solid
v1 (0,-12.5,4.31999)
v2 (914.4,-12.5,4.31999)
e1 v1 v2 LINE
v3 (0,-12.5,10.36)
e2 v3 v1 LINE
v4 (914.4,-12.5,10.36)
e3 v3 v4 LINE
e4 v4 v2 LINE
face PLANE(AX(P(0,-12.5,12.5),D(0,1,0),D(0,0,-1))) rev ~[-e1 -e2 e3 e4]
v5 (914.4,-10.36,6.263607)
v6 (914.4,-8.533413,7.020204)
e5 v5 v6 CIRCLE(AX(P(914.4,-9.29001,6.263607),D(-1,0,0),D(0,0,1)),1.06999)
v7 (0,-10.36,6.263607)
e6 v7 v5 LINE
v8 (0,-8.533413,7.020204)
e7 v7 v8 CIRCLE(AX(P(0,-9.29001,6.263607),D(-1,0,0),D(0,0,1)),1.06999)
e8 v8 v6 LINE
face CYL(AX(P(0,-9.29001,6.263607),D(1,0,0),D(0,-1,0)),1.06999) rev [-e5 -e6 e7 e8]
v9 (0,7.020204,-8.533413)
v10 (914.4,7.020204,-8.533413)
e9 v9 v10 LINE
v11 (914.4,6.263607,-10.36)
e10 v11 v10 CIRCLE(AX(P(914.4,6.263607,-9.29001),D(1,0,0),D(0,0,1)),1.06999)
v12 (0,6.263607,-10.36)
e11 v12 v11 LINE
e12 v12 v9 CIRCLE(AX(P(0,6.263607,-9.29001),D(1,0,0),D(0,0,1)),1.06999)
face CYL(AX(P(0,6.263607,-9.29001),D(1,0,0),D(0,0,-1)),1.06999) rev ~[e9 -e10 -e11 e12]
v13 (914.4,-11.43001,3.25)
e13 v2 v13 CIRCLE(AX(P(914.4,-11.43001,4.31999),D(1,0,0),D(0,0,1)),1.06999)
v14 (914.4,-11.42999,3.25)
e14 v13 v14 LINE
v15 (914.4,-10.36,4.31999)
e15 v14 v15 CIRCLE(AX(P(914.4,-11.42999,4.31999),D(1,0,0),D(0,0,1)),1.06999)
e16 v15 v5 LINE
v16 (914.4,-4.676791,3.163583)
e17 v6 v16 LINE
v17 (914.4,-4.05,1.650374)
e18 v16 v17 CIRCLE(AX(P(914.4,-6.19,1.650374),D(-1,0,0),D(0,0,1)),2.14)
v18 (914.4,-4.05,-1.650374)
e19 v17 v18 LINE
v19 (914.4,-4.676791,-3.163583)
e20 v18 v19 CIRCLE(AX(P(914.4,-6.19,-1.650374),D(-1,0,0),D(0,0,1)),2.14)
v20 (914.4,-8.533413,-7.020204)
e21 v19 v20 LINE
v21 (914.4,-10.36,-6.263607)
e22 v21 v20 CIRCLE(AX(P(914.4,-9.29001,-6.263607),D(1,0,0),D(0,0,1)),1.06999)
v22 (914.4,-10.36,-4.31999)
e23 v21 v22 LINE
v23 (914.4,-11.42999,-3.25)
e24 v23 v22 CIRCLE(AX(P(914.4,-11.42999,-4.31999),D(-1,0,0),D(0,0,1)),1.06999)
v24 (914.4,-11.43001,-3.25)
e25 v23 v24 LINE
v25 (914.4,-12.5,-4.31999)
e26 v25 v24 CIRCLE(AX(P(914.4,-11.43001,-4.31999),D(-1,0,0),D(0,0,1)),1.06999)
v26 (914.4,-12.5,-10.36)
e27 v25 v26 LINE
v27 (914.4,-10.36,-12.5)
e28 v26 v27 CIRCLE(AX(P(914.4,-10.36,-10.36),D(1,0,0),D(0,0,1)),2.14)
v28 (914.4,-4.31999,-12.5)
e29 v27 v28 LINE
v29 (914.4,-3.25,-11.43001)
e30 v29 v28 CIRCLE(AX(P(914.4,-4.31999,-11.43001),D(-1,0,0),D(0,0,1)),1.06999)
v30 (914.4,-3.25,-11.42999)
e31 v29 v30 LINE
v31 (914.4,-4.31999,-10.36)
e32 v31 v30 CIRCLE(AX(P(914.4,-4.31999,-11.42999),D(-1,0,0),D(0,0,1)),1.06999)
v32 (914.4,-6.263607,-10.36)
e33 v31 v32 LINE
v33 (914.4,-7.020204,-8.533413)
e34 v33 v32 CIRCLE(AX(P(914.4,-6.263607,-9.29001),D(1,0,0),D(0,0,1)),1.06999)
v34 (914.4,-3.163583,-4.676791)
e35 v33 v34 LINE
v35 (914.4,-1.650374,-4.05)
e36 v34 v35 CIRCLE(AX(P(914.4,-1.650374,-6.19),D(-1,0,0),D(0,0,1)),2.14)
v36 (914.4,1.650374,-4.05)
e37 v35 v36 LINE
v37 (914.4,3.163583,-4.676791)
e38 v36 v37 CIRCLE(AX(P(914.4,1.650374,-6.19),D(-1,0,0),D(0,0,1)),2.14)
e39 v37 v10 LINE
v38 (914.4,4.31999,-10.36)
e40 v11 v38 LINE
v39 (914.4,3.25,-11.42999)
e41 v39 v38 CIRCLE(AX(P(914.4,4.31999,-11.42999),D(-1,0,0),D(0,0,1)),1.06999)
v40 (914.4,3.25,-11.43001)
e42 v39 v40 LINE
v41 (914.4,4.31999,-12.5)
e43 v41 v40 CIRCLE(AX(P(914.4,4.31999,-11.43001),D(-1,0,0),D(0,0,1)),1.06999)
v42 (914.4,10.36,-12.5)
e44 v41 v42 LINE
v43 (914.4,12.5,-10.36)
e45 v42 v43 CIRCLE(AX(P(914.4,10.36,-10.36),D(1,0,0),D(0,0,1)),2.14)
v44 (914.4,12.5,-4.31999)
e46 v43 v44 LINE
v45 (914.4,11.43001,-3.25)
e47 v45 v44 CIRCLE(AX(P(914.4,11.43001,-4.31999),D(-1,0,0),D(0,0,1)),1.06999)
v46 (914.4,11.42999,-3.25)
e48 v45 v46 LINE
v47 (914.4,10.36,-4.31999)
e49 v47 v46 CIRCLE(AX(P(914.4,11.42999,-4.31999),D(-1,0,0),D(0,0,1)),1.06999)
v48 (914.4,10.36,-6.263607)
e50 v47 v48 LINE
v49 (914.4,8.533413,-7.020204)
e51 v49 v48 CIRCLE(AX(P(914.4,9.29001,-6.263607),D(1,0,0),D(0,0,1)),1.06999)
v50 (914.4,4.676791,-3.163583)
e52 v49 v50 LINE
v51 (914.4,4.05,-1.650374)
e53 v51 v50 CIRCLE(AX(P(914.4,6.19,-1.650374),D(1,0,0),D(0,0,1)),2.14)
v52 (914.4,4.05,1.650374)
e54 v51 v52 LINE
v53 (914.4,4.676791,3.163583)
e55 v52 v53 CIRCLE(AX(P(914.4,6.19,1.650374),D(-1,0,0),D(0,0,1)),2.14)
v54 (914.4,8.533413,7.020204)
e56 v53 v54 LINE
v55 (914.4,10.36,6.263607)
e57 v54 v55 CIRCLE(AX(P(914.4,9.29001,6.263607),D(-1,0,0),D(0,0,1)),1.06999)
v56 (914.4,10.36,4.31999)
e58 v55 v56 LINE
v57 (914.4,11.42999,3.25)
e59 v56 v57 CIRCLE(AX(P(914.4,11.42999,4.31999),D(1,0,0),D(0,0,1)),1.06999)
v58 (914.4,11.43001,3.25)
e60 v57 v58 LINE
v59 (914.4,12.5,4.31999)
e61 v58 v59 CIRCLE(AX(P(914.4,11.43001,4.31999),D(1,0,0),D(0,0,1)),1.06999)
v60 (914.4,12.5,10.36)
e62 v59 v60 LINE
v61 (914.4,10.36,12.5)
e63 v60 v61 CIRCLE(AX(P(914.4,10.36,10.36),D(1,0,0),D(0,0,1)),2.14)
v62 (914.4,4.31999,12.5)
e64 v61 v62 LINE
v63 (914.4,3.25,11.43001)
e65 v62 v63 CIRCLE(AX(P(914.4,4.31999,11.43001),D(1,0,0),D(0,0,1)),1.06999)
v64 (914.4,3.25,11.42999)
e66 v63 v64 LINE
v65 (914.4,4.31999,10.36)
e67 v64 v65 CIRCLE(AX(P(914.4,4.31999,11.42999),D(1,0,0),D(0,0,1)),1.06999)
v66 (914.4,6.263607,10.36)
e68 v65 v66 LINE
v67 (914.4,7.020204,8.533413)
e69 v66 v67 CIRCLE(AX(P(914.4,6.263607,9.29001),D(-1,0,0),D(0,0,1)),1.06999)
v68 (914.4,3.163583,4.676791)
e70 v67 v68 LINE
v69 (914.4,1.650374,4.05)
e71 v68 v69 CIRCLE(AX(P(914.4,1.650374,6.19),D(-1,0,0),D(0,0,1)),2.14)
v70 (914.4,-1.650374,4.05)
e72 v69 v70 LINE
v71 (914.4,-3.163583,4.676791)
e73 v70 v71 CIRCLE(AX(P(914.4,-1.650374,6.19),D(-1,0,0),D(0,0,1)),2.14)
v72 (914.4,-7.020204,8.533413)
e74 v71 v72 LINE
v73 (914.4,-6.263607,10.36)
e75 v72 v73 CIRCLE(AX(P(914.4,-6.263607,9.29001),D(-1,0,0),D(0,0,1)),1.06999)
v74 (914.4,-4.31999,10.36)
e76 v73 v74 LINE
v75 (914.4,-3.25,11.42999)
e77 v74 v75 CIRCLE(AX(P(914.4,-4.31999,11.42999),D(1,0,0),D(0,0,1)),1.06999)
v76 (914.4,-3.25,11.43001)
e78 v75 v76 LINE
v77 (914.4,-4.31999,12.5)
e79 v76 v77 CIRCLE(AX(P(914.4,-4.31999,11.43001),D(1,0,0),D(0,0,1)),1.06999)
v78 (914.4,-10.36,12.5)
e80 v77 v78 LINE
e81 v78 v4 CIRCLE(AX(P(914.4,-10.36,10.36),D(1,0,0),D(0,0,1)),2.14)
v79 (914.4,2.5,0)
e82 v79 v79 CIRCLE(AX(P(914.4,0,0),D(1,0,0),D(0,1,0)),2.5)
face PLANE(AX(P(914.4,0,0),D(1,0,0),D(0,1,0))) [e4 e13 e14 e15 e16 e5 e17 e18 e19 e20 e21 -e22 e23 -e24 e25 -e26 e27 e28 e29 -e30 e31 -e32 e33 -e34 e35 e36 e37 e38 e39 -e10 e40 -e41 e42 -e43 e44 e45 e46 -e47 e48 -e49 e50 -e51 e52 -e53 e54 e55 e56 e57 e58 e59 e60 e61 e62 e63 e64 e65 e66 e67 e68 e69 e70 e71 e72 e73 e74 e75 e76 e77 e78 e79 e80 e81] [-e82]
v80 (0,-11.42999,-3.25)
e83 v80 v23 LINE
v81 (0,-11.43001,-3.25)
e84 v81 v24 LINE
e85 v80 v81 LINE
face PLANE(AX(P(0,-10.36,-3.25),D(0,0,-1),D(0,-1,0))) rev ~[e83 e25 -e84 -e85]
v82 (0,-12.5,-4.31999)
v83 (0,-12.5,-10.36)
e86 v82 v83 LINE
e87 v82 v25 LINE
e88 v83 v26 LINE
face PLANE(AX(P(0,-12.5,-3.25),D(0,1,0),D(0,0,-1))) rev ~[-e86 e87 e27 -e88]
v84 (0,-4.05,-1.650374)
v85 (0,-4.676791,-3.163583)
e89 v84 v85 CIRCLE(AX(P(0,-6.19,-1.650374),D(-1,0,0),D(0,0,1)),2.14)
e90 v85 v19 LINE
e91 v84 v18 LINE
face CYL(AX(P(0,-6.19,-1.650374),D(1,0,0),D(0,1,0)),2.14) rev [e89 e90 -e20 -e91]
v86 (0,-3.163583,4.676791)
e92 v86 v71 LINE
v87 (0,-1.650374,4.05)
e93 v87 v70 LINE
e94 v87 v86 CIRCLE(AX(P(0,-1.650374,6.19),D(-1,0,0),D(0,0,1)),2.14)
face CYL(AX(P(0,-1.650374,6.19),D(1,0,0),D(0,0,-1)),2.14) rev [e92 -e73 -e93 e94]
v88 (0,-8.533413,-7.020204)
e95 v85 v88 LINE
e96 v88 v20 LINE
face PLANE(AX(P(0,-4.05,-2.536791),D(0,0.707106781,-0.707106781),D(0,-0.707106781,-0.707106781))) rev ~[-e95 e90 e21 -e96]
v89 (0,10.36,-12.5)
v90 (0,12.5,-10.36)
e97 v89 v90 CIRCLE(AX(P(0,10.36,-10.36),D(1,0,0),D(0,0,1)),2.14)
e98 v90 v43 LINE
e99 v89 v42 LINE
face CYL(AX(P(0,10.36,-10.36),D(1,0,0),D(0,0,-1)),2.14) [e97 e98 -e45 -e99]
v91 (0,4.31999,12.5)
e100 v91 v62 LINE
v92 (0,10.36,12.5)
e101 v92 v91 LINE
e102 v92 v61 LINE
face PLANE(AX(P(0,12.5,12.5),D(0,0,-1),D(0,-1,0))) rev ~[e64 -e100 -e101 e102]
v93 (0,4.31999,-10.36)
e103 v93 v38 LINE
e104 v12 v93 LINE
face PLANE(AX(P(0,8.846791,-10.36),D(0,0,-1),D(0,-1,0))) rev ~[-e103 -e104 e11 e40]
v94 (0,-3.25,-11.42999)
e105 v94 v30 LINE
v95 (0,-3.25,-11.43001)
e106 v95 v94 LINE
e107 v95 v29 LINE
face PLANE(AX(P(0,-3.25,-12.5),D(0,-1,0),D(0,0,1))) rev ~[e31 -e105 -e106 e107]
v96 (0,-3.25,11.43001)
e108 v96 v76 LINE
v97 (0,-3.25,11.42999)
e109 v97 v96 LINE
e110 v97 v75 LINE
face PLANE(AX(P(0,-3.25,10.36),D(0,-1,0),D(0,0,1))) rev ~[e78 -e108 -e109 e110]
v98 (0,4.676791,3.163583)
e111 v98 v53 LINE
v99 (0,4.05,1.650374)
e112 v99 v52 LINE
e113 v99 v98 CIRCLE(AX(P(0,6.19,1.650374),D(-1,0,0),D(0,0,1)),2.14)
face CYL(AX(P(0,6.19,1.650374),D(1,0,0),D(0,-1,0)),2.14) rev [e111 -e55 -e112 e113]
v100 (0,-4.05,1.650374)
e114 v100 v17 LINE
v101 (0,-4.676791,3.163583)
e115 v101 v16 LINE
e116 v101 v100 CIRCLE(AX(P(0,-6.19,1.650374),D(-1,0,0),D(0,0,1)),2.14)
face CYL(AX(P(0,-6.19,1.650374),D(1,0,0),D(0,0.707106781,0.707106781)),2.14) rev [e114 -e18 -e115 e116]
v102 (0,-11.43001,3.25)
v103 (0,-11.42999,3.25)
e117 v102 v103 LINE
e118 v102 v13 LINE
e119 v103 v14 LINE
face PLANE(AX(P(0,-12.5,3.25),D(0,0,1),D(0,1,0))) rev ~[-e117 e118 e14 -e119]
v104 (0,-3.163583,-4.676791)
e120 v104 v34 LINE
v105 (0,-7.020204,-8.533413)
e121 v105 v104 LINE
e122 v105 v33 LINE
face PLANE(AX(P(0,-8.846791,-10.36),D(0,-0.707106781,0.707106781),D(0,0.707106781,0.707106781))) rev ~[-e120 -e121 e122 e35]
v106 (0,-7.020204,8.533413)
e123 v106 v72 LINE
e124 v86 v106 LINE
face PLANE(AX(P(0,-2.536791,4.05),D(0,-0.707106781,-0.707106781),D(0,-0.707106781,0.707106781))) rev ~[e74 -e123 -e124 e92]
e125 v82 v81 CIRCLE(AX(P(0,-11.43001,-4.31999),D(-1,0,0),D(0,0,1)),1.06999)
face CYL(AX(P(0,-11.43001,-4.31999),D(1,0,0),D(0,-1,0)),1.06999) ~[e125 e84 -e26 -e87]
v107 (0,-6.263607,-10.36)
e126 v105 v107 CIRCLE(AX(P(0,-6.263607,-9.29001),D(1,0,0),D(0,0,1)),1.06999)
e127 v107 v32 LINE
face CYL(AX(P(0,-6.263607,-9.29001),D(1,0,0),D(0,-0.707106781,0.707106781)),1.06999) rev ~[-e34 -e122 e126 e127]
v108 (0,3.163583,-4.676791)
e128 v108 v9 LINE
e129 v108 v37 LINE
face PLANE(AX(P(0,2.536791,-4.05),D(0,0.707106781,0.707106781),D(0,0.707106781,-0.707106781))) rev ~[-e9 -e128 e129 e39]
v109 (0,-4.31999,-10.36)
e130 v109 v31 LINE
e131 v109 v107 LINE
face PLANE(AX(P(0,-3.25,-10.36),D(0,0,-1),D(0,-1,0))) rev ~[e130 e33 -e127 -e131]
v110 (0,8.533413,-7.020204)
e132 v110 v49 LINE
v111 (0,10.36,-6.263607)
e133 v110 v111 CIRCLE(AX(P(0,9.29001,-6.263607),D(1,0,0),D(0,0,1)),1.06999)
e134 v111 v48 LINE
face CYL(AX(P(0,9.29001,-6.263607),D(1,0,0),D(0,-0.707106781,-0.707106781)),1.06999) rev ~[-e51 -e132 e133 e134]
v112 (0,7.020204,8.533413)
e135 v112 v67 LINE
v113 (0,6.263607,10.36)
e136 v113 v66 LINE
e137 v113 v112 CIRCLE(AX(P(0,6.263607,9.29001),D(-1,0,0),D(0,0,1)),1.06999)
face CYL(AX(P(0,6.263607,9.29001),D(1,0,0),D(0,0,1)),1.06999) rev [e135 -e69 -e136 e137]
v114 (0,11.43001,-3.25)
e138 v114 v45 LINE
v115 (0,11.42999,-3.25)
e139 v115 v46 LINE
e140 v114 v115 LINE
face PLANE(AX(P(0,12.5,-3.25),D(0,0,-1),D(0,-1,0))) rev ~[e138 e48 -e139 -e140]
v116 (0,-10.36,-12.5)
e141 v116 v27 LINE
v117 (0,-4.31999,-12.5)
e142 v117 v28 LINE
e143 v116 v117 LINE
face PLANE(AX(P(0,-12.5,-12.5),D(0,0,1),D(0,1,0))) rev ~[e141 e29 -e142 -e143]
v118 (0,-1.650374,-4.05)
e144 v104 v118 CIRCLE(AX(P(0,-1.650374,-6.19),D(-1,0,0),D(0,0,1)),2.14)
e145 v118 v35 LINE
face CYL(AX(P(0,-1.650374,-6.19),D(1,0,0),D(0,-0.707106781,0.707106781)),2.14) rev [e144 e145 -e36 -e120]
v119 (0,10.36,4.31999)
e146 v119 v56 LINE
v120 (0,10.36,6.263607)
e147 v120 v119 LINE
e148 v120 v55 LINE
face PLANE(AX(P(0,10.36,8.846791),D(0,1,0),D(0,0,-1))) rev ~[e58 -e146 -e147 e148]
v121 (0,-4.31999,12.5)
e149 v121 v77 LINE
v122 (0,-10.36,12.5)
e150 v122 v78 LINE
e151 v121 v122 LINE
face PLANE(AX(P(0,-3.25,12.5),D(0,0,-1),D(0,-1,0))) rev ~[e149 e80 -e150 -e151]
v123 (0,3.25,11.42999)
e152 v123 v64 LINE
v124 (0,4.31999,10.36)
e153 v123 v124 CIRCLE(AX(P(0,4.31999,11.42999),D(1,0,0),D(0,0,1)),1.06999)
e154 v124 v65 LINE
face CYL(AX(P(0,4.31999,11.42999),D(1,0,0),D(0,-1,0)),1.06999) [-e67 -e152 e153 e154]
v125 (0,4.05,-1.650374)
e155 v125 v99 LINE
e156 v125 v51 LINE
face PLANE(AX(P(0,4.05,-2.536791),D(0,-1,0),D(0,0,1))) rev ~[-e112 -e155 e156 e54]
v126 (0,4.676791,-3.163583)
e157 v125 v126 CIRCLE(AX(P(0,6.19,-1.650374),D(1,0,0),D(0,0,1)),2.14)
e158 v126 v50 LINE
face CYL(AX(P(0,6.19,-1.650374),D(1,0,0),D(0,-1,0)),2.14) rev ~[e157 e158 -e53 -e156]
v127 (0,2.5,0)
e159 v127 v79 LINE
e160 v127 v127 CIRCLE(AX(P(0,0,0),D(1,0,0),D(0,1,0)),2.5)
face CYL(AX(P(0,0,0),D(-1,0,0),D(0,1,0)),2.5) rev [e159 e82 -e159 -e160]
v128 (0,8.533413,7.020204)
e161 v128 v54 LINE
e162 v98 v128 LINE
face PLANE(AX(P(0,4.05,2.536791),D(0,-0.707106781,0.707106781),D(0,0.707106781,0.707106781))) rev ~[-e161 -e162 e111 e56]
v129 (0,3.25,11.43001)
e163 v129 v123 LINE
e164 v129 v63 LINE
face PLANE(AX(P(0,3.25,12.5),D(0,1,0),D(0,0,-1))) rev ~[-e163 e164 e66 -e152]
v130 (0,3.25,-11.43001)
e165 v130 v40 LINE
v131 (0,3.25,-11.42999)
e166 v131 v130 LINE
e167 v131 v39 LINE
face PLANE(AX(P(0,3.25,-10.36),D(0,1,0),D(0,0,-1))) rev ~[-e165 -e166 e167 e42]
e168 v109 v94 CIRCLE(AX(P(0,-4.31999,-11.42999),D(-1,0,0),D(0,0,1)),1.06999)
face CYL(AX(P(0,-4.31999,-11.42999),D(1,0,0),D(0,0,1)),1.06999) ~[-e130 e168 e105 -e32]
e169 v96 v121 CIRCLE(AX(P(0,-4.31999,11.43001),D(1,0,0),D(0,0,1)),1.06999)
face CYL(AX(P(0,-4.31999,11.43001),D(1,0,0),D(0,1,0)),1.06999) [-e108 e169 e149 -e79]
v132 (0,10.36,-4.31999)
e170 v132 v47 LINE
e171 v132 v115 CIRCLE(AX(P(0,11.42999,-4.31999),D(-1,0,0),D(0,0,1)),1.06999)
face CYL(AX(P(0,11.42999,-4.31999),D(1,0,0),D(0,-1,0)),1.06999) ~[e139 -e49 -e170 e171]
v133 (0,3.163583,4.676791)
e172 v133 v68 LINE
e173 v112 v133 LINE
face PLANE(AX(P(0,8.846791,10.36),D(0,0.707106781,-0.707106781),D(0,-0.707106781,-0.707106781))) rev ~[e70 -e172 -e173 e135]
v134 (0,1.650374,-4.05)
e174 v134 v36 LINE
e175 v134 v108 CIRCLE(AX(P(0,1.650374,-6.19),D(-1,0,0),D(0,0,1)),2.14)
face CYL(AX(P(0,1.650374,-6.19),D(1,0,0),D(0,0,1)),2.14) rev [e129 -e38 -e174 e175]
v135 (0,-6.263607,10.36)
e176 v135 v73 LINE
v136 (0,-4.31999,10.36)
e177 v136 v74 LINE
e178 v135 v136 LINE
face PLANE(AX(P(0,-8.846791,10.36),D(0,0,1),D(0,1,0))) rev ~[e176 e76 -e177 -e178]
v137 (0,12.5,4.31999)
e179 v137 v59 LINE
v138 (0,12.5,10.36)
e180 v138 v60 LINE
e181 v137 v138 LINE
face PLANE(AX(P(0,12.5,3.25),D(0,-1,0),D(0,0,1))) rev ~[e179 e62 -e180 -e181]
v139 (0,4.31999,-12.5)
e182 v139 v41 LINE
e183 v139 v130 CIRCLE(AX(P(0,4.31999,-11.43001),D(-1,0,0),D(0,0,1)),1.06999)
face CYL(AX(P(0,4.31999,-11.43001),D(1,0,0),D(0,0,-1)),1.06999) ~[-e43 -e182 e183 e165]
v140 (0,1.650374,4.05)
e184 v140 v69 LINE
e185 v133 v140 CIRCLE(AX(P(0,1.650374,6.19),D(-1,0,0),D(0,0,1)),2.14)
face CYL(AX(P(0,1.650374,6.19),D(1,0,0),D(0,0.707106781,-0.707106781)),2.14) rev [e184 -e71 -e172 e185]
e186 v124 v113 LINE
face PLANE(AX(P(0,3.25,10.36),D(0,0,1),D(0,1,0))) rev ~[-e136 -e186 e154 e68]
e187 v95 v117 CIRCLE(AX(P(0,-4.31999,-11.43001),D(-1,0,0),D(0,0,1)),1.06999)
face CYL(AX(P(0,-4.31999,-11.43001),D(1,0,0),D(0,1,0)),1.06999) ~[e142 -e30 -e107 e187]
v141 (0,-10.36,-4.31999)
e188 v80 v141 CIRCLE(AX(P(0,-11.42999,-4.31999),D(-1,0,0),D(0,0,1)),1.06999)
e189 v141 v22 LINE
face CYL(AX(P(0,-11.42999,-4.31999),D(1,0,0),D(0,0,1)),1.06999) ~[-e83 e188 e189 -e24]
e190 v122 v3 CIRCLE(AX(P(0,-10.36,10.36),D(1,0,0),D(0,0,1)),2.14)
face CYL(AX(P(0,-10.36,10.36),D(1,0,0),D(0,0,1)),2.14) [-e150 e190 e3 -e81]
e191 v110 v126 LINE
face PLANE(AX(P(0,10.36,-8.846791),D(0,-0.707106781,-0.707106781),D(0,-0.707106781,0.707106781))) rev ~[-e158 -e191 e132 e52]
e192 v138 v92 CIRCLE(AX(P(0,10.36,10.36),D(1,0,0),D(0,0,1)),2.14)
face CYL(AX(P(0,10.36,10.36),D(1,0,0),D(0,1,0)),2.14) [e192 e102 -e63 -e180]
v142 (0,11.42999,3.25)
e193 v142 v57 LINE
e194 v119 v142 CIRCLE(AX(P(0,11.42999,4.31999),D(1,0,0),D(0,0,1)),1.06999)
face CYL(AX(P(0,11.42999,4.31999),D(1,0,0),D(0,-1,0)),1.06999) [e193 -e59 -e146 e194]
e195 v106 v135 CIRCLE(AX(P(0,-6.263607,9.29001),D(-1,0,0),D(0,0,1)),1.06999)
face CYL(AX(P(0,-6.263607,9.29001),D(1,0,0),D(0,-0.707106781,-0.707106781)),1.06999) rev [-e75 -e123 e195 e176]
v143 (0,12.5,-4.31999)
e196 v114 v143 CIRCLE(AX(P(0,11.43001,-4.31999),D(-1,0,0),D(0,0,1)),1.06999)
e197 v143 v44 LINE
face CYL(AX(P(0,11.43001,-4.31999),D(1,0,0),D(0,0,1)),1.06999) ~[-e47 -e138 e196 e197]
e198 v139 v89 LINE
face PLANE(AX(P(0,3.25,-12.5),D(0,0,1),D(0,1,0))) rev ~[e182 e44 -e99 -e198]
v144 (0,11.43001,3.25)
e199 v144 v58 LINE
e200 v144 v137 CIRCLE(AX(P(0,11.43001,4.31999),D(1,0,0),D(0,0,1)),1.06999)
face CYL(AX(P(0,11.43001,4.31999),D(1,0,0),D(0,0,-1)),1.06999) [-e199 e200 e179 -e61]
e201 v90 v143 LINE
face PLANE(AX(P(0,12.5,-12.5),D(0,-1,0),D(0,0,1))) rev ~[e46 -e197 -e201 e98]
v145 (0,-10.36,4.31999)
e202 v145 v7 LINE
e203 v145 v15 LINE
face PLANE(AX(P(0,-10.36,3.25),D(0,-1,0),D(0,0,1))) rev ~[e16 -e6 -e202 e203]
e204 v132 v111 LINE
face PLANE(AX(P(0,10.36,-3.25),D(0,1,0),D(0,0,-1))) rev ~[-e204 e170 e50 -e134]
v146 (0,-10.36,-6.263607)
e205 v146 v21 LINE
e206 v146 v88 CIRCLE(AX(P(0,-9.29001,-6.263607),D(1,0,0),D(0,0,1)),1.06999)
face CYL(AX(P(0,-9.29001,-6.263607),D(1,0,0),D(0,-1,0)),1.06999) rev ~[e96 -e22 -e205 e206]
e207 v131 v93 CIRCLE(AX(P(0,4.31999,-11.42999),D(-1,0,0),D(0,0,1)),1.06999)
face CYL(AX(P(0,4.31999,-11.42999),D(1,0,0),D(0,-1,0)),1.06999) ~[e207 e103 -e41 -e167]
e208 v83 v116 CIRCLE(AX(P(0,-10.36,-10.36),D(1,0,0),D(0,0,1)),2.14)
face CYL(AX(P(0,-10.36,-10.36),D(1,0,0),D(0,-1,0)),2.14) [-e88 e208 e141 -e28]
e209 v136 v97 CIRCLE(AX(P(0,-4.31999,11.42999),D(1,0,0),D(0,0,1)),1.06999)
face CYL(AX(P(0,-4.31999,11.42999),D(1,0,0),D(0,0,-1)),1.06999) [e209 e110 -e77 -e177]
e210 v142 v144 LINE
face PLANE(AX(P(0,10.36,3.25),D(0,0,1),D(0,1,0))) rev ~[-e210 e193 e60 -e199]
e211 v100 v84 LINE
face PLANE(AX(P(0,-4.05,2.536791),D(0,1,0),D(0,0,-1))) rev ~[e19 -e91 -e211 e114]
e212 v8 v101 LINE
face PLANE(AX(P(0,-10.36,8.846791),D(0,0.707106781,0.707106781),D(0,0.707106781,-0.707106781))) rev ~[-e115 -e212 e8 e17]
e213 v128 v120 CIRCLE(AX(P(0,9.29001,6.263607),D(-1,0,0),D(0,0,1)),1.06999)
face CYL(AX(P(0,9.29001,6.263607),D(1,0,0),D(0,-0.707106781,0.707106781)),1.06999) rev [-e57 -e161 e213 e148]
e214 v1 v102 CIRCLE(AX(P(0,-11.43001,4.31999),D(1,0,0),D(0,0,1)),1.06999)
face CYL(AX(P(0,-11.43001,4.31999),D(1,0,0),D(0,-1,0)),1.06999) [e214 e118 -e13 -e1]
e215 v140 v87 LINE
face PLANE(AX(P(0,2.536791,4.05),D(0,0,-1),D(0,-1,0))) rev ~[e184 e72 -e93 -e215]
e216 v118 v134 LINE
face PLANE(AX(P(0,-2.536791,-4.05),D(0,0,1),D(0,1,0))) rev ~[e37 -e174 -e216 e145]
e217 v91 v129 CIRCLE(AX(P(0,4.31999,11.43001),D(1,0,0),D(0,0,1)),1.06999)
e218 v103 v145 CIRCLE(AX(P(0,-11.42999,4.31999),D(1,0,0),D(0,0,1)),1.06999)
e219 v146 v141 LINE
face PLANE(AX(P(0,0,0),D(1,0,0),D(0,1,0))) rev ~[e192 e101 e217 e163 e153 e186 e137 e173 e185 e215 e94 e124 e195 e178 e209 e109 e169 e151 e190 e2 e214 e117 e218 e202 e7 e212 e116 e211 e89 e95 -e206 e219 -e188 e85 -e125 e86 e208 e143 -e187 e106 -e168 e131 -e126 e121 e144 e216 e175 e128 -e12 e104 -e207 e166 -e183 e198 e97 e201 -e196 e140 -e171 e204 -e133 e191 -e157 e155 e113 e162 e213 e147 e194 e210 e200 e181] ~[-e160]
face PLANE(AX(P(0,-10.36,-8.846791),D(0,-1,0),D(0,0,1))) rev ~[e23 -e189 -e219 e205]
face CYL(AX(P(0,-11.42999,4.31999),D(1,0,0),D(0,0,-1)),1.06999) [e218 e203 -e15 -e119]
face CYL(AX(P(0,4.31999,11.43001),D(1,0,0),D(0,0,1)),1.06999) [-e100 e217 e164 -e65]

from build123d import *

# Parameters (mm, degrees)
F0_R     = 2.5
F2_DEPTH = 914.4
F3_R     = 2.14
F4_R     = 1.06999


# Not quite as in the source:
# - a fillet or chamfer is up to 0.001 mm smaller than in the source, because OpenCascade refuses the exact size


with BuildPart() as f2:
    # F0 (on Right) → F2 (new body)
    with BuildSketch(Plane.YZ):
        Polygon((2.5367914883, -4.05), (4.05, -4.05), (4.05, -2.5367914883), (4.05, 2.5367914883), (4.05, 4.05), (2.5367914883, 4.05), (-2.5367914883, 4.05), (-4.05, 4.05), (-4.05, 2.5367914883), (-4.05, -2.5367914883), (-4.05, -4.05), (-2.5367914883, -4.05), align=None)
        Circle(F0_R, mode=Mode.SUBTRACT)
        Polygon((-10.36, 8.8467914883), (-4.05, 2.5367914883), (-4.05, 4.05), (-2.5367914883, 4.05), (-8.8467914883, 10.36), (-3.25, 10.36), (-3.25, 12.5), (-12.5, 12.5), (-12.5, 3.25), (-10.36, 3.25), align=None)
        Polygon((4.05, 4.05), (4.05, 2.5367914883), (10.36, 8.8467914883), (10.36, 3.25), (12.5, 3.25), (12.5, 12.5), (3.25, 12.5), (3.25, 10.36), (8.8467914883, 10.36), (2.5367914883, 4.05), align=None)
        Polygon((-8.8467914883, -10.36), (-2.5367914883, -4.05), (-4.05, -4.05), (-4.05, -2.5367914883), (-10.36, -8.8467914883), (-10.36, -3.25), (-12.5, -3.25), (-12.5, -12.5), (-3.25, -12.5), (-3.25, -10.36), align=None)
        Polygon((4.05, -2.5367914883), (4.05, -4.05), (2.5367914883, -4.05), (8.8467914883, -10.36), (3.25, -10.36), (3.25, -12.5), (12.5, -12.5), (12.5, -3.25), (10.36, -3.25), (10.36, -8.8467914883), align=None)
    extrude(amount=F2_DEPTH)

    # F3
    f3_edges = [f2.edges().sort_by_distance(p)[0] for p in [
        (457.2, -12.5, 12.5),
        (457.2, 12.5, 12.5),
        (457.2, 12.5, -12.5),
        (457.2, -12.5, -12.5),
        (457.2, -4.05, 2.536791),
        (457.2, -4.05, -2.536791),
        (457.2, -2.536791, 4.05),
        (457.2, 2.536791, 4.05),
        (457.2, 4.05, 2.536791),
        (457.2, 4.05, -2.536791),
        (457.2, -2.536791, -4.05),
        (457.2, 2.536791, -4.05),
    ]]
    fillet(f3_edges, radius=F3_R)

    # F4 (radius 1.07 in the source; OpenCascade refuses exactly that, so slightly less here)
    f4_edges = [f2.edges().sort_by_distance(p)[0] for p in [
        (457.2, -12.5, 3.25),
        (457.2, -10.36, 3.25),
        (457.2, -3.25, 12.5),
        (457.2, -3.25, 10.36),
        (457.2, 3.25, 12.5),
        (457.2, 3.25, 10.36),
        (457.2, 10.36, 3.25),
        (457.2, 12.5, 3.25),
        (457.2, 10.36, -3.25),
        (457.2, 12.5, -3.25),
        (457.2, 3.25, -10.36),
        (457.2, 3.25, -12.5),
        (457.2, -3.25, -10.36),
        (457.2, -3.25, -12.5),
        (457.2, -10.36, 8.846791),
        (457.2, -8.846791, 10.36),
        (457.2, 8.846791, 10.36),
        (457.2, 10.36, 8.846791),
        (457.2, 8.846791, -10.36),
        (457.2, 10.36, -8.846791),
        (457.2, -8.846791, -10.36),
        (457.2, -10.36, -8.846791),
        (457.2, -10.36, -3.25),
        (457.2, -12.5, -3.25),
    ]]
    fillet(f4_edges, radius=F4_R)


solid = f2.part
